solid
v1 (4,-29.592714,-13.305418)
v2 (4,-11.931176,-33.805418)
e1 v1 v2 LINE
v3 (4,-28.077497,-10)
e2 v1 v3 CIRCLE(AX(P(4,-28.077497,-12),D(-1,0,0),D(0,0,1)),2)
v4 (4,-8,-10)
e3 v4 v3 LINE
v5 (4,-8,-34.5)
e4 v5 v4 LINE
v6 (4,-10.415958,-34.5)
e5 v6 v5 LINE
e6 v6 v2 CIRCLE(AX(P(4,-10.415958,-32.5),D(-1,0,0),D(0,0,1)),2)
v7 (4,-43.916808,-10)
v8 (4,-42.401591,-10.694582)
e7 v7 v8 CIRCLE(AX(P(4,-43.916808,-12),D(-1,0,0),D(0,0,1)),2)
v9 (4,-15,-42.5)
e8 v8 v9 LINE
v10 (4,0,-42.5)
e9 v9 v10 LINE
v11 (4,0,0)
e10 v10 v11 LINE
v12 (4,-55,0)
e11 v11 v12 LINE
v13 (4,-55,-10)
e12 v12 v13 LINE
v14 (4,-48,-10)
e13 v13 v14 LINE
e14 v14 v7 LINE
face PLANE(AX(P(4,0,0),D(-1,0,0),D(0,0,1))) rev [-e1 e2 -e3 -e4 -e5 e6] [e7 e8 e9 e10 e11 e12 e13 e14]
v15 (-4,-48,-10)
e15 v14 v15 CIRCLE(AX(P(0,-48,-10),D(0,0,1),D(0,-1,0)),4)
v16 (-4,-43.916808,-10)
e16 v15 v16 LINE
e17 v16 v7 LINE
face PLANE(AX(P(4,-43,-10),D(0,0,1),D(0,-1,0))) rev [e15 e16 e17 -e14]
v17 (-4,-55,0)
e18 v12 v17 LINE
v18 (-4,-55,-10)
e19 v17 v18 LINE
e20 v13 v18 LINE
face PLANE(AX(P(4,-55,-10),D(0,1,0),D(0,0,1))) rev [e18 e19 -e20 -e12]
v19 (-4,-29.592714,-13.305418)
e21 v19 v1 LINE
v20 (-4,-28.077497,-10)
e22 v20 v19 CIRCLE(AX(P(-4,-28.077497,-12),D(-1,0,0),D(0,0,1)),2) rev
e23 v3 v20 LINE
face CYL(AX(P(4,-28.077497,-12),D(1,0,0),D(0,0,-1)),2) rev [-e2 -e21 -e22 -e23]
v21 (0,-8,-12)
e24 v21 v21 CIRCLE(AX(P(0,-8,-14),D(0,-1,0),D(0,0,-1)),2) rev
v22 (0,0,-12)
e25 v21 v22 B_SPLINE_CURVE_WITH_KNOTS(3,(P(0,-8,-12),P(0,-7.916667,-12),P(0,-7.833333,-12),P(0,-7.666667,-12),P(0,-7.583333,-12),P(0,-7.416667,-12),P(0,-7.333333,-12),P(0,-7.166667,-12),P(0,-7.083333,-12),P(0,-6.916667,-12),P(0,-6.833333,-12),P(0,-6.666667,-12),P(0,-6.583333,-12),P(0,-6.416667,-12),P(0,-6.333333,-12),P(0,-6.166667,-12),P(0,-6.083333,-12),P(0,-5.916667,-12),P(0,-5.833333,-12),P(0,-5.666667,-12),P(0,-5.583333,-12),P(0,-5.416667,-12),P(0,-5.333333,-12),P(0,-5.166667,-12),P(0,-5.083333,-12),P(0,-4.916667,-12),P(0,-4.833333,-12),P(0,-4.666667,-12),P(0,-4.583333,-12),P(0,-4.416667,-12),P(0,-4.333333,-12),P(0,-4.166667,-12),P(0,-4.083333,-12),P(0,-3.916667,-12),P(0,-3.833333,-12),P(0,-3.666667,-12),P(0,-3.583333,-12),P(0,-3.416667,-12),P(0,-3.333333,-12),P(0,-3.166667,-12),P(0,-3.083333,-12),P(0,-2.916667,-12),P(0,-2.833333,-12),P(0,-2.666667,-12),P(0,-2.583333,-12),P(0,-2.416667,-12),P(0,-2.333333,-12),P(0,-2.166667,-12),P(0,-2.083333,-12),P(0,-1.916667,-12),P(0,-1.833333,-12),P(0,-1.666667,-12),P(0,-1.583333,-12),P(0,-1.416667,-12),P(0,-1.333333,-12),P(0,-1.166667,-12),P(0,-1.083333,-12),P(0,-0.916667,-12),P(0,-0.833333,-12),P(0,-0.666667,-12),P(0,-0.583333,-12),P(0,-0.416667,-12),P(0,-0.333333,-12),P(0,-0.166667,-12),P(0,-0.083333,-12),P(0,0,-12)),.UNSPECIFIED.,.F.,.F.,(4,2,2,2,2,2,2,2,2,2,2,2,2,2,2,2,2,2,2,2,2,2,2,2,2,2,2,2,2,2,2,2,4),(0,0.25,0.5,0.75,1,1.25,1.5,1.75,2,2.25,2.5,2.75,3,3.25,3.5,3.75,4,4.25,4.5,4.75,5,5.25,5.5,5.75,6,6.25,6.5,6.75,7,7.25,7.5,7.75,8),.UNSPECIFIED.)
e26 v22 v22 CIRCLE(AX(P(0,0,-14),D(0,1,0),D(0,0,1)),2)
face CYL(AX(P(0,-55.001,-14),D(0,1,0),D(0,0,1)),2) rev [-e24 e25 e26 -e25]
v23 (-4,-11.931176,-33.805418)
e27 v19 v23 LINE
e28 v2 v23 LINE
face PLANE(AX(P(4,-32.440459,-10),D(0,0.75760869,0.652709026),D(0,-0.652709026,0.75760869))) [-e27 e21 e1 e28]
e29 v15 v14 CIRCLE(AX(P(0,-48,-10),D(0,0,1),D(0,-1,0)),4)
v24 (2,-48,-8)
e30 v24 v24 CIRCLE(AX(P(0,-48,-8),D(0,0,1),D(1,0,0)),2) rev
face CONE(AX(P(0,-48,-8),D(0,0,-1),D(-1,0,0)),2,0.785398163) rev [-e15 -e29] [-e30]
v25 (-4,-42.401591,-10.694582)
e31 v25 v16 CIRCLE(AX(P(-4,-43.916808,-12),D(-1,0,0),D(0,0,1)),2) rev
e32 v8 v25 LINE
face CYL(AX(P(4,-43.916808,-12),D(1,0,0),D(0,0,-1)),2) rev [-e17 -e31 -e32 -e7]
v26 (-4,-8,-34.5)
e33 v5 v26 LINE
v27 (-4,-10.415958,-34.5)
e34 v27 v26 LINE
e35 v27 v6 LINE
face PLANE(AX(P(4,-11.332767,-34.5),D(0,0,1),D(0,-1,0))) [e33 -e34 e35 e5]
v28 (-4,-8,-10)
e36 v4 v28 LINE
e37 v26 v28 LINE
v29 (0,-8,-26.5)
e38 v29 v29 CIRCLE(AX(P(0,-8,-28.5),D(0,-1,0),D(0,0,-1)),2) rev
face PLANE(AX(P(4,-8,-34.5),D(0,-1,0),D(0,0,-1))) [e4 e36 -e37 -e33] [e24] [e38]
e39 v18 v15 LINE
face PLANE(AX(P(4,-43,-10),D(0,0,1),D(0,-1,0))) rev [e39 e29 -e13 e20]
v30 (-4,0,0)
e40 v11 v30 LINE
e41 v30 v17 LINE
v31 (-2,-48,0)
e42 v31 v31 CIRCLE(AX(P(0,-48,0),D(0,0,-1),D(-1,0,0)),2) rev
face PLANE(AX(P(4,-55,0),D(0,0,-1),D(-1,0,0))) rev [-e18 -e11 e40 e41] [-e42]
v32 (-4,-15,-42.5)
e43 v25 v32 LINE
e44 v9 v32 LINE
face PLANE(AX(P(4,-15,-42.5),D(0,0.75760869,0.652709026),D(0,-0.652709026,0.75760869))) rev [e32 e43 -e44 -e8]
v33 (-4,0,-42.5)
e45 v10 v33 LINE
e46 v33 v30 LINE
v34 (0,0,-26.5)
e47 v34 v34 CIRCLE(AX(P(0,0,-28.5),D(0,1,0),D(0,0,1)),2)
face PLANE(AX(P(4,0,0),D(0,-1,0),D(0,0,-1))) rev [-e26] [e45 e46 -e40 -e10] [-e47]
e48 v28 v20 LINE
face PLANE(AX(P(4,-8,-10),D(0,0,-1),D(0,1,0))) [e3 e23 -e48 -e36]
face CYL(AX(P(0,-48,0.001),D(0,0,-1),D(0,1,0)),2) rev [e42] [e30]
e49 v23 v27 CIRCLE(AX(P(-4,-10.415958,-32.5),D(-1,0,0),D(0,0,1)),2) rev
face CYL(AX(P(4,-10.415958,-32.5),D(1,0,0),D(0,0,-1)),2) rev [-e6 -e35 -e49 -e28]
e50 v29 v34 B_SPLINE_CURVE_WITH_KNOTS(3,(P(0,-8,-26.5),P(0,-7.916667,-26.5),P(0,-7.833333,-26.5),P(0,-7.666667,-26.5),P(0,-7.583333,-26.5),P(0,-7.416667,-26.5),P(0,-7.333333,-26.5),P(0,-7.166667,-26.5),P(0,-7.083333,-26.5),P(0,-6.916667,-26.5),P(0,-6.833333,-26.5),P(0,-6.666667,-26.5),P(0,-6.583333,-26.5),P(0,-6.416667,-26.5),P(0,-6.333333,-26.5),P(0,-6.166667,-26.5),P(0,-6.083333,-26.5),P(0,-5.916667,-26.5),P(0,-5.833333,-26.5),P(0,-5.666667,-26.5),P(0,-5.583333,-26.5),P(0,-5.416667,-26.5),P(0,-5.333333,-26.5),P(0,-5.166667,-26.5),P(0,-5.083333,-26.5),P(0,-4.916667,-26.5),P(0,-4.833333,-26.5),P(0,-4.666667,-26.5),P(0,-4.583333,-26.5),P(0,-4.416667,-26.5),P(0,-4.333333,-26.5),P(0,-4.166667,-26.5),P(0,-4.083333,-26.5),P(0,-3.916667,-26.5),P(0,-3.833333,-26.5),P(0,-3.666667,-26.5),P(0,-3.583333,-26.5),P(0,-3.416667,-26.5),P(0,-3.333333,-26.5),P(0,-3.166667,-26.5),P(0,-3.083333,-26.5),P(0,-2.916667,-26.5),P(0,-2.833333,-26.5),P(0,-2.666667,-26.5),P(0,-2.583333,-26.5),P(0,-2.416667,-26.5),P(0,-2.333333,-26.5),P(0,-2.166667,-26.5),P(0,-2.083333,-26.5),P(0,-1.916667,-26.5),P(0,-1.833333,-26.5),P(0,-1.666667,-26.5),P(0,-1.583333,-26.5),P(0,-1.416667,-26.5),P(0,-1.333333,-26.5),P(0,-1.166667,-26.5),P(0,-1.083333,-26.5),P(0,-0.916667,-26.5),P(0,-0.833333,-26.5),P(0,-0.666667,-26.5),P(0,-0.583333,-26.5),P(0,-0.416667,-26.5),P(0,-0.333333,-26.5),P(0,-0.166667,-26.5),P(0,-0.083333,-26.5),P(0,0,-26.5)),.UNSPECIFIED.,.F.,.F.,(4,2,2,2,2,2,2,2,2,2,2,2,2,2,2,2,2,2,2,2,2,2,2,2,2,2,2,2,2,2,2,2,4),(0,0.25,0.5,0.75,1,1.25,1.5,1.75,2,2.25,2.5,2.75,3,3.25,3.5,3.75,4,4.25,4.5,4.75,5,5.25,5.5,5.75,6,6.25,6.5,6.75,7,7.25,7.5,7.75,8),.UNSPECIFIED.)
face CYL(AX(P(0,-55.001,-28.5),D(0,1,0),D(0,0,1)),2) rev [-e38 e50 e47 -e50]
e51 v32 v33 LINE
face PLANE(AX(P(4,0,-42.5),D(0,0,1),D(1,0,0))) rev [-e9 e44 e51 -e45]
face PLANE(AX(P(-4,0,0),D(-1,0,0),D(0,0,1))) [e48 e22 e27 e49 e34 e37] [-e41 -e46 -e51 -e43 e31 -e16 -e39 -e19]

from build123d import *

# Parameters (mm, degrees)
EXTRUDE_1_DEPTH     = 4
CUT_EXTRUDE_1_REACH = 71.622
SKETCH_2_R          = 2
CUT_EXTRUDE_3_REACH = 66.01
SKETCH_4_R          = 2
FILLET_1_R          = 2
CHAMFER_1_SIZE      = 2


with BuildPart() as part:
    # 草图1 → 凸台-拉伸1 (new, symmetric)
    with BuildSketch(Plane(origin=(0, 0, 0), x_dir=(0, 0, -1), z_dir=(1, 0, 0))):
        Polygon((0, 0), (42.5, 0), (42.5, -15), (10, -43), (10, -55), (0, -55), align=None)
        Polygon((10, -32.440459038), (34.5, -11.33276673), (34.5, -8), (10, -8), align=None, mode=Mode.SUBTRACT)
    extrude(amount=EXTRUDE_1_DEPTH, both=True)

    # 草图2 → 切除-拉伸1 (cut, up to next)
    with BuildSketch(Plane(origin=(0, 0, 0), x_dir=(1, 0, 0), z_dir=(0, 1, 0)), mode=Mode.PRIVATE) as cut_extrude_1_sk1:
        with Locations(Location((0, 14, 0), (0, 0, 270))):
            Circle(SKETCH_2_R)
    cut_extrude_1_tool1 = extrude(cut_extrude_1_sk1.sketch, amount=-CUT_EXTRUDE_1_REACH, mode=Mode.PRIVATE) & part.part
    # 草图2 → 切除-拉伸1 (cut, up to next)
    with BuildSketch(Plane(origin=(0, 0, 0), x_dir=(1, 0, 0), z_dir=(0, 1, 0)), mode=Mode.PRIVATE) as cut_extrude_1_sk2:
        with Locations(Location((0, 28.5, 0), (0, 0, 270))):
            Circle(SKETCH_2_R)
    cut_extrude_1_tool2 = extrude(cut_extrude_1_sk2.sketch, amount=-CUT_EXTRUDE_1_REACH, mode=Mode.PRIVATE) & part.part
    add(cut_extrude_1_tool1.solids().sort_by_distance((0, 0, -14))[0], mode=Mode.SUBTRACT)
    add(cut_extrude_1_tool2.solids().sort_by_distance((0, 0, -28.5))[0], mode=Mode.SUBTRACT)

    # 草图4 → 切除-拉伸3 (cut, up to next)
    with BuildSketch(Plane(origin=(0, 0, -10), x_dir=(-1, 0, 0), z_dir=(0, 0, -1)), mode=Mode.PRIVATE) as cut_extrude_3_sk1:
        with Locations(Location((0, -48, 0), (0, 0, 90))):
            Circle(SKETCH_4_R)
    cut_extrude_3_tool1 = extrude(cut_extrude_3_sk1.sketch, amount=-CUT_EXTRUDE_3_REACH, mode=Mode.PRIVATE) & part.part
    add(cut_extrude_3_tool1.solids().sort_by_distance((0, -48, -10))[0], mode=Mode.SUBTRACT)

    # 圆角1
    fillet_1_edges = [part.edges().sort_by_distance(p)[0] for p in [
        (0, -43, -10),
        (0, -32.440459038, -10),
        (0, -11.33276673, -34.5),
    ]]
    fillet(fillet_1_edges, radius=FILLET_1_R)

    # 倒角1
    chamfer_1_edges = [part.edges().sort_by_distance(p)[0] for p in [
        (0, -50, -10),
    ]]
    chamfer(chamfer_1_edges, length=CHAMFER_1_SIZE - 0.0001)  # a hair under: the kernel refuses the full size


solid = part.part
